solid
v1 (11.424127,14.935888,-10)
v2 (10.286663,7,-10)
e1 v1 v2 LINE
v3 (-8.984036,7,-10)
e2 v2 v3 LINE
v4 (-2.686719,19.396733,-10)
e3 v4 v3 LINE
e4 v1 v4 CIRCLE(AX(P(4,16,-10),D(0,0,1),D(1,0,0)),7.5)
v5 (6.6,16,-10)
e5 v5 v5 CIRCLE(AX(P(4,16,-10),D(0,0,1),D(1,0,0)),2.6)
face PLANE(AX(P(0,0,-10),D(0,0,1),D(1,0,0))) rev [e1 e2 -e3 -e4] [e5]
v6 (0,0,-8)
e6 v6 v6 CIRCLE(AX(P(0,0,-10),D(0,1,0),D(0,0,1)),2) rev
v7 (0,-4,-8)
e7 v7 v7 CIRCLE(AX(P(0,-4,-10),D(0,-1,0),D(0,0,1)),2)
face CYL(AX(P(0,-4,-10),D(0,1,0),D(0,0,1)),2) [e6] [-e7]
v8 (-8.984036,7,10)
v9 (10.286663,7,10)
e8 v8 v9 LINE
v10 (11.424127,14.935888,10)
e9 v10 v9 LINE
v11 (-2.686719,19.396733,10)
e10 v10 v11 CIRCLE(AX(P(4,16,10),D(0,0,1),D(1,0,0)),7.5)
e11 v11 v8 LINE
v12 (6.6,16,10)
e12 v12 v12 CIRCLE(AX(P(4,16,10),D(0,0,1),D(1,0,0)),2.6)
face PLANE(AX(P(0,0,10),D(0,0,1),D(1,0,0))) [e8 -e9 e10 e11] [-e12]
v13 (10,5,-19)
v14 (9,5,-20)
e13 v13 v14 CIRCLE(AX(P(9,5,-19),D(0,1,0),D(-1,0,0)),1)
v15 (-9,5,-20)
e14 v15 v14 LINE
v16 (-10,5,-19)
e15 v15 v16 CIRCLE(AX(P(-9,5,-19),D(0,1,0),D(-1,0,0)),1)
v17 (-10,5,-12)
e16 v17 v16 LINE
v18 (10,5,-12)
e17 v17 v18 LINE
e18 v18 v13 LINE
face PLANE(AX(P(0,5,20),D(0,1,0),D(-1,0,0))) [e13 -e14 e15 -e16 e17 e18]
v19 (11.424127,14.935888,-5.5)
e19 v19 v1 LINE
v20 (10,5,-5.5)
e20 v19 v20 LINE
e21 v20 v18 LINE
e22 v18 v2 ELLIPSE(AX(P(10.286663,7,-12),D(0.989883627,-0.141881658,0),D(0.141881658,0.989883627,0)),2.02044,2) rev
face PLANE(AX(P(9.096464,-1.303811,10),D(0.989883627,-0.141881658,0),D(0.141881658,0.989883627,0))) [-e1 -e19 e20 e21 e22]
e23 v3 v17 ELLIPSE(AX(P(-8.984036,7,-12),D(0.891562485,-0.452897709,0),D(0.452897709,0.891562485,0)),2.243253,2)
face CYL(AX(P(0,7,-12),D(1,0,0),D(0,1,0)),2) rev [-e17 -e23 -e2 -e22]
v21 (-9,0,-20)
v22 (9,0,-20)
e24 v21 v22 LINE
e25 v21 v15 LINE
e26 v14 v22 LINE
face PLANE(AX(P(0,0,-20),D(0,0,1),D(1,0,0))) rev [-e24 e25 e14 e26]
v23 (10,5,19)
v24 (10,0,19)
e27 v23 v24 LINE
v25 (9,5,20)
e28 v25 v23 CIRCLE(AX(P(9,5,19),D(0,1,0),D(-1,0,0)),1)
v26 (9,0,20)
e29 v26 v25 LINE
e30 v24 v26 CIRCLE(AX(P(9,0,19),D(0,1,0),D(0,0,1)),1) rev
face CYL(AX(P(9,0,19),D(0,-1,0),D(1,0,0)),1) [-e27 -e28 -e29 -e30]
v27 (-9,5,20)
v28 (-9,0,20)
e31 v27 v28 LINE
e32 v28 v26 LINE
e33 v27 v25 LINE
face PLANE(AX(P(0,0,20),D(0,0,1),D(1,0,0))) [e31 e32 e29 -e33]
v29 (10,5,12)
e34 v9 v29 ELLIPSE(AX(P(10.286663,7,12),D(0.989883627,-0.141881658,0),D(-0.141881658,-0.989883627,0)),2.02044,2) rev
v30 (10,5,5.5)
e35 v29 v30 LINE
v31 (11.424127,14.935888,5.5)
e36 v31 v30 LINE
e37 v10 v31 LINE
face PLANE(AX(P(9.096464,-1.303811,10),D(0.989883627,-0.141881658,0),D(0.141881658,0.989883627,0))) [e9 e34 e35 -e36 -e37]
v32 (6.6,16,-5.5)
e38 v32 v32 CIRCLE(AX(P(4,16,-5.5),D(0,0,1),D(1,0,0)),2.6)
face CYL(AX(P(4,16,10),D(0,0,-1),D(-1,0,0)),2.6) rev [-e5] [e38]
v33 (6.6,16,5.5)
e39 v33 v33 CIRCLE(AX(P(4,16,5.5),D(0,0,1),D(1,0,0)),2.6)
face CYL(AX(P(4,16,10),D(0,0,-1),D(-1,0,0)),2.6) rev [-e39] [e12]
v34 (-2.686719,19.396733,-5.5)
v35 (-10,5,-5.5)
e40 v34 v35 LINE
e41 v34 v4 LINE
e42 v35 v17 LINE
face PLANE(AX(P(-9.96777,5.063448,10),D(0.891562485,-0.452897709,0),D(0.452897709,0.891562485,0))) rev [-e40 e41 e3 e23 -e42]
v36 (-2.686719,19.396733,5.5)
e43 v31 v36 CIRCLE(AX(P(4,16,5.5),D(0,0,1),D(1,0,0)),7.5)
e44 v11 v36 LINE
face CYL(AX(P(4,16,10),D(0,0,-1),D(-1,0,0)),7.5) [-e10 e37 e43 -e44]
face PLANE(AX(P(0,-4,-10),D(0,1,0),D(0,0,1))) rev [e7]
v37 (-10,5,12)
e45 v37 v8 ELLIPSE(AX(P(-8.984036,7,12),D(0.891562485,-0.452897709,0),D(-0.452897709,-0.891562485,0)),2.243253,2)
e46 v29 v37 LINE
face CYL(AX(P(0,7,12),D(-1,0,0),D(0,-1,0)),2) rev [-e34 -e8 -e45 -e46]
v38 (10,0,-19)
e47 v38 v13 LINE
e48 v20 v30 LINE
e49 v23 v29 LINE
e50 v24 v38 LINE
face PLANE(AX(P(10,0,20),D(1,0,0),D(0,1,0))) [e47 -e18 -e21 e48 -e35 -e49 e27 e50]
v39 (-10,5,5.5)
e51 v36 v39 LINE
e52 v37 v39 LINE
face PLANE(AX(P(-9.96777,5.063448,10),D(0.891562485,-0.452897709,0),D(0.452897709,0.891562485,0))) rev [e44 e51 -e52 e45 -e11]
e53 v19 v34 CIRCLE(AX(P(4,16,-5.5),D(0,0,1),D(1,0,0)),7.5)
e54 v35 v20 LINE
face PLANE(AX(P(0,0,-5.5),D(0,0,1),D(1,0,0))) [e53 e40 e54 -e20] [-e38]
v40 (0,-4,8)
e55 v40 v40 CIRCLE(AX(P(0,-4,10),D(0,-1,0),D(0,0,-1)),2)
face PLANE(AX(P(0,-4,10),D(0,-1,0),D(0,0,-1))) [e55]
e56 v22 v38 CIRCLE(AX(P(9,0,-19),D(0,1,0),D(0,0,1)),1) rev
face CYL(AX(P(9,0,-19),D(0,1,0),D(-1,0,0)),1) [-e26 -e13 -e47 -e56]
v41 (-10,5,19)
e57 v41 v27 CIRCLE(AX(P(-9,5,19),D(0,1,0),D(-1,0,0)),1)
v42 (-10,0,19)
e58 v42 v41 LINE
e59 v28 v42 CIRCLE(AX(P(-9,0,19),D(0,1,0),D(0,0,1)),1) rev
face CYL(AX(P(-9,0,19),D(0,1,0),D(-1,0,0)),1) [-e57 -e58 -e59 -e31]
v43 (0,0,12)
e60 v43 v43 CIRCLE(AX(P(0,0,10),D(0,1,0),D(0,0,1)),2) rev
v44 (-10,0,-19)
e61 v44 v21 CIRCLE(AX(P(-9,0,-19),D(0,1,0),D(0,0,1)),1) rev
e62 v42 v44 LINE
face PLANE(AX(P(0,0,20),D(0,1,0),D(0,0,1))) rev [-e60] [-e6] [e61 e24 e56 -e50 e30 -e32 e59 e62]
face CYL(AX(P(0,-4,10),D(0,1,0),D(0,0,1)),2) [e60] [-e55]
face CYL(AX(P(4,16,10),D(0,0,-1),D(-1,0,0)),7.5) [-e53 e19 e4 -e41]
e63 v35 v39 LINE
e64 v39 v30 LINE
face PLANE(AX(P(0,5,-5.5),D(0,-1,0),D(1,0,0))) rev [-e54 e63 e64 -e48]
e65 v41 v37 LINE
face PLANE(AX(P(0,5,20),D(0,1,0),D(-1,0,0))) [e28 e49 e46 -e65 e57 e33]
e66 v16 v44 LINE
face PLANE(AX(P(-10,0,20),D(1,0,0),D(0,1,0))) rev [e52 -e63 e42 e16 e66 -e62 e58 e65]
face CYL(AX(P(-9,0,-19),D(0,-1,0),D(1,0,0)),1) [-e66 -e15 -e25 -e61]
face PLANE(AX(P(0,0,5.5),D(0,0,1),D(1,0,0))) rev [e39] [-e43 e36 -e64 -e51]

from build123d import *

# Parameters (mm, degrees)
SKETCH1_R           = 2.6
BOSS_EXTRUDE1_DEPTH = 10
SKETCH1_3_W         = 20
SKETCH1_3_H         = 5
BOSS_EXTRUDE2_DEPTH = 20
SKETCH1_4_R         = 2.6
CUT_EXTRUDE1_DEPTH  = 5.5
SKETCH2_R           = 2
BOSS_EXTRUDE3_DEPTH = 4
FILLET1_R           = 1
FILLET2_R           = 2


with BuildPart() as part:
    # Sketch1 → Boss-Extrude1 (new, symmetric)
    with BuildSketch(Plane.XY):
        with BuildLine():
            Line((-2.686718641, 19.396732815), (-10, 5))
            Line((-10, 5), (10, 5))
            Line((10, 5), (11.424127203, 14.935887565))
            ThreePointArc((11.424127203, 14.935887565), (6.260691915, 23.151172776), (-2.686718641, 19.396732815))
        make_face()
        with Locations((4, 16)):
            Circle(SKETCH1_R, mode=Mode.SUBTRACT)
    extrude(amount=BOSS_EXTRUDE1_DEPTH, both=True)

    # Sketch1<3> → Boss-Extrude2 (add, symmetric)
    with BuildSketch(Plane.XY):
        with Locations((0, 2.5)):
            Rectangle(SKETCH1_3_W, SKETCH1_3_H)
    extrude(amount=BOSS_EXTRUDE2_DEPTH, both=True)

    # Sketch1<4> → Cut-Extrude1 (cut, symmetric)
    with BuildSketch(Plane.XY):
        with BuildLine():
            ThreePointArc((11.424127203, 14.935887565), (6.260691915, 23.151172776), (-2.686718641, 19.396732815))
            Line((-2.686718641, 19.396732815), (-10, 5))
            Line((-10, 5), (10, 5))
            Line((10, 5), (11.424127203, 14.935887565))
        make_face()
        with Locations((4, 16)):
            Circle(SKETCH1_4_R, mode=Mode.SUBTRACT)
    extrude(amount=CUT_EXTRUDE1_DEPTH, both=True, mode=Mode.SUBTRACT)

    # Sketch2 → Boss-Extrude3 (add)
    with BuildSketch(Plane.XZ):
        with Locations(Location((0, 10, 0), (0, 0, 90))):
            Circle(SKETCH2_R)
        with Locations(Location((0, -10, 0), (0, 0, 90))):
            Circle(SKETCH2_R)
    extrude(amount=BOSS_EXTRUDE3_DEPTH)

    # Fillet1
    fillet1_edges = [part.edges().sort_by_distance(p)[0] for p in [
        (-10, 2.5, -20),
        (10, 2.5, 20),
        (-10, 2.5, 20),
        (10, 2.5, -20),
    ]]
    fillet(fillet1_edges, radius=FILLET1_R)

    # Fillet2
    # the kernel refuses this fillet: 2 mm, written as the material it adds along each edge
    with BuildSketch(Plane(origin=(-10, 5, 10), x_dir=(0, 0, 1), z_dir=(1, 0, 0))) as fillet2_piece_1_section:
        with BuildLine():
            CenterArc((FILLET2_R, -FILLET2_R), FILLET2_R, 90, 90)
            Line((0, -FILLET2_R), (0, 0))
            Line((0, 0), (FILLET2_R, 0))
        make_face()
    fillet2_piece_1 = extrude(amount=20, mode=Mode.PRIVATE)
    fillet2_piece_1 = split(fillet2_piece_1, bisect_by=Plane(origin=(-7.744522427, 9.440073667, 10.455584543), z_dir=(0.8915624854306203, -0.45289770872988017, 0)), keep=Keep.TOP, mode=Mode.PRIVATE)
    fillet2_piece_1 = split(fillet2_piece_1, bisect_by=Plane(origin=(9.863918043, 4.050579875, 10.455584543), z_dir=(-0.9898836270660257, 0.14188165796398555, 0)), keep=Keep.TOP, mode=Mode.PRIVATE)
    add(fillet2_piece_1)
    with BuildSketch(Plane(origin=(-10, 5, 10), x_dir=(0, 0, 1), z_dir=(1, 0, 0))) as fillet2_piece_2_section:
        with BuildLine():
            CenterArc((FILLET2_R, -FILLET2_R), FILLET2_R, 90, 90)
            Line((0, -FILLET2_R), (0, 0))
            Line((0, 0), (FILLET2_R, 0))
        make_face()
    fillet2_piece_2 = extrude(amount=25, mode=Mode.PRIVATE)
    fillet2_piece_2 = split(fillet2_piece_2, bisect_by=Plane(origin=(10, 5.860236103, 10.212945025), z_dir=(1, 0, 0)), keep=Keep.TOP, mode=Mode.PRIVATE)
    fillet2_piece_2 = split(fillet2_piece_2, bisect_by=Plane(origin=(10.122058034, 5.851577653, 10.212945025), z_dir=(-0.9898836270660257, 0.14188165796398555, 0)), keep=Keep.TOP, mode=Mode.PRIVATE)
    add(fillet2_piece_2)
    with BuildSketch(Plane(origin=(-10, 5, -10), x_dir=(0, 0, -1), z_dir=(1, 0, 0))) as fillet2_piece_3_section:
        with BuildLine():
            CenterArc((FILLET2_R, FILLET2_R), FILLET2_R, 180, 90)
            Line((0, FILLET2_R), (0, 0))
            Line((0, 0), (FILLET2_R, 0))
        make_face()
    fillet2_piece_3 = extrude(amount=20, mode=Mode.PRIVATE)
    fillet2_piece_3 = split(fillet2_piece_3, bisect_by=Plane(origin=(-7.744522427, 9.440073667, -10.455584543), z_dir=(0.8915624854306203, -0.45289770872988017, 0)), keep=Keep.TOP, mode=Mode.PRIVATE)
    fillet2_piece_3 = split(fillet2_piece_3, bisect_by=Plane(origin=(9.863918043, 4.050579875, -10.455584543), z_dir=(-0.9898836270660257, 0.14188165796398555, 0)), keep=Keep.TOP, mode=Mode.PRIVATE)
    add(fillet2_piece_3)
    with BuildSketch(Plane(origin=(-10, 5, -10), x_dir=(0, 0, -1), z_dir=(1, 0, 0))) as fillet2_piece_4_section:
        with BuildLine():
            CenterArc((FILLET2_R, FILLET2_R), FILLET2_R, 180, 90)
            Line((0, FILLET2_R), (0, 0))
            Line((0, 0), (FILLET2_R, 0))
        make_face()
    fillet2_piece_4 = extrude(amount=25, mode=Mode.PRIVATE)
    fillet2_piece_4 = split(fillet2_piece_4, bisect_by=Plane(origin=(10, 5.860236103, -10.212945025), z_dir=(1, 0, 0)), keep=Keep.TOP, mode=Mode.PRIVATE)
    fillet2_piece_4 = split(fillet2_piece_4, bisect_by=Plane(origin=(10.122058034, 5.851577653, -10.212945025), z_dir=(-0.9898836270660257, 0.14188165796398555, 0)), keep=Keep.TOP, mode=Mode.PRIVATE)
    add(fillet2_piece_4)


solid = part.part
